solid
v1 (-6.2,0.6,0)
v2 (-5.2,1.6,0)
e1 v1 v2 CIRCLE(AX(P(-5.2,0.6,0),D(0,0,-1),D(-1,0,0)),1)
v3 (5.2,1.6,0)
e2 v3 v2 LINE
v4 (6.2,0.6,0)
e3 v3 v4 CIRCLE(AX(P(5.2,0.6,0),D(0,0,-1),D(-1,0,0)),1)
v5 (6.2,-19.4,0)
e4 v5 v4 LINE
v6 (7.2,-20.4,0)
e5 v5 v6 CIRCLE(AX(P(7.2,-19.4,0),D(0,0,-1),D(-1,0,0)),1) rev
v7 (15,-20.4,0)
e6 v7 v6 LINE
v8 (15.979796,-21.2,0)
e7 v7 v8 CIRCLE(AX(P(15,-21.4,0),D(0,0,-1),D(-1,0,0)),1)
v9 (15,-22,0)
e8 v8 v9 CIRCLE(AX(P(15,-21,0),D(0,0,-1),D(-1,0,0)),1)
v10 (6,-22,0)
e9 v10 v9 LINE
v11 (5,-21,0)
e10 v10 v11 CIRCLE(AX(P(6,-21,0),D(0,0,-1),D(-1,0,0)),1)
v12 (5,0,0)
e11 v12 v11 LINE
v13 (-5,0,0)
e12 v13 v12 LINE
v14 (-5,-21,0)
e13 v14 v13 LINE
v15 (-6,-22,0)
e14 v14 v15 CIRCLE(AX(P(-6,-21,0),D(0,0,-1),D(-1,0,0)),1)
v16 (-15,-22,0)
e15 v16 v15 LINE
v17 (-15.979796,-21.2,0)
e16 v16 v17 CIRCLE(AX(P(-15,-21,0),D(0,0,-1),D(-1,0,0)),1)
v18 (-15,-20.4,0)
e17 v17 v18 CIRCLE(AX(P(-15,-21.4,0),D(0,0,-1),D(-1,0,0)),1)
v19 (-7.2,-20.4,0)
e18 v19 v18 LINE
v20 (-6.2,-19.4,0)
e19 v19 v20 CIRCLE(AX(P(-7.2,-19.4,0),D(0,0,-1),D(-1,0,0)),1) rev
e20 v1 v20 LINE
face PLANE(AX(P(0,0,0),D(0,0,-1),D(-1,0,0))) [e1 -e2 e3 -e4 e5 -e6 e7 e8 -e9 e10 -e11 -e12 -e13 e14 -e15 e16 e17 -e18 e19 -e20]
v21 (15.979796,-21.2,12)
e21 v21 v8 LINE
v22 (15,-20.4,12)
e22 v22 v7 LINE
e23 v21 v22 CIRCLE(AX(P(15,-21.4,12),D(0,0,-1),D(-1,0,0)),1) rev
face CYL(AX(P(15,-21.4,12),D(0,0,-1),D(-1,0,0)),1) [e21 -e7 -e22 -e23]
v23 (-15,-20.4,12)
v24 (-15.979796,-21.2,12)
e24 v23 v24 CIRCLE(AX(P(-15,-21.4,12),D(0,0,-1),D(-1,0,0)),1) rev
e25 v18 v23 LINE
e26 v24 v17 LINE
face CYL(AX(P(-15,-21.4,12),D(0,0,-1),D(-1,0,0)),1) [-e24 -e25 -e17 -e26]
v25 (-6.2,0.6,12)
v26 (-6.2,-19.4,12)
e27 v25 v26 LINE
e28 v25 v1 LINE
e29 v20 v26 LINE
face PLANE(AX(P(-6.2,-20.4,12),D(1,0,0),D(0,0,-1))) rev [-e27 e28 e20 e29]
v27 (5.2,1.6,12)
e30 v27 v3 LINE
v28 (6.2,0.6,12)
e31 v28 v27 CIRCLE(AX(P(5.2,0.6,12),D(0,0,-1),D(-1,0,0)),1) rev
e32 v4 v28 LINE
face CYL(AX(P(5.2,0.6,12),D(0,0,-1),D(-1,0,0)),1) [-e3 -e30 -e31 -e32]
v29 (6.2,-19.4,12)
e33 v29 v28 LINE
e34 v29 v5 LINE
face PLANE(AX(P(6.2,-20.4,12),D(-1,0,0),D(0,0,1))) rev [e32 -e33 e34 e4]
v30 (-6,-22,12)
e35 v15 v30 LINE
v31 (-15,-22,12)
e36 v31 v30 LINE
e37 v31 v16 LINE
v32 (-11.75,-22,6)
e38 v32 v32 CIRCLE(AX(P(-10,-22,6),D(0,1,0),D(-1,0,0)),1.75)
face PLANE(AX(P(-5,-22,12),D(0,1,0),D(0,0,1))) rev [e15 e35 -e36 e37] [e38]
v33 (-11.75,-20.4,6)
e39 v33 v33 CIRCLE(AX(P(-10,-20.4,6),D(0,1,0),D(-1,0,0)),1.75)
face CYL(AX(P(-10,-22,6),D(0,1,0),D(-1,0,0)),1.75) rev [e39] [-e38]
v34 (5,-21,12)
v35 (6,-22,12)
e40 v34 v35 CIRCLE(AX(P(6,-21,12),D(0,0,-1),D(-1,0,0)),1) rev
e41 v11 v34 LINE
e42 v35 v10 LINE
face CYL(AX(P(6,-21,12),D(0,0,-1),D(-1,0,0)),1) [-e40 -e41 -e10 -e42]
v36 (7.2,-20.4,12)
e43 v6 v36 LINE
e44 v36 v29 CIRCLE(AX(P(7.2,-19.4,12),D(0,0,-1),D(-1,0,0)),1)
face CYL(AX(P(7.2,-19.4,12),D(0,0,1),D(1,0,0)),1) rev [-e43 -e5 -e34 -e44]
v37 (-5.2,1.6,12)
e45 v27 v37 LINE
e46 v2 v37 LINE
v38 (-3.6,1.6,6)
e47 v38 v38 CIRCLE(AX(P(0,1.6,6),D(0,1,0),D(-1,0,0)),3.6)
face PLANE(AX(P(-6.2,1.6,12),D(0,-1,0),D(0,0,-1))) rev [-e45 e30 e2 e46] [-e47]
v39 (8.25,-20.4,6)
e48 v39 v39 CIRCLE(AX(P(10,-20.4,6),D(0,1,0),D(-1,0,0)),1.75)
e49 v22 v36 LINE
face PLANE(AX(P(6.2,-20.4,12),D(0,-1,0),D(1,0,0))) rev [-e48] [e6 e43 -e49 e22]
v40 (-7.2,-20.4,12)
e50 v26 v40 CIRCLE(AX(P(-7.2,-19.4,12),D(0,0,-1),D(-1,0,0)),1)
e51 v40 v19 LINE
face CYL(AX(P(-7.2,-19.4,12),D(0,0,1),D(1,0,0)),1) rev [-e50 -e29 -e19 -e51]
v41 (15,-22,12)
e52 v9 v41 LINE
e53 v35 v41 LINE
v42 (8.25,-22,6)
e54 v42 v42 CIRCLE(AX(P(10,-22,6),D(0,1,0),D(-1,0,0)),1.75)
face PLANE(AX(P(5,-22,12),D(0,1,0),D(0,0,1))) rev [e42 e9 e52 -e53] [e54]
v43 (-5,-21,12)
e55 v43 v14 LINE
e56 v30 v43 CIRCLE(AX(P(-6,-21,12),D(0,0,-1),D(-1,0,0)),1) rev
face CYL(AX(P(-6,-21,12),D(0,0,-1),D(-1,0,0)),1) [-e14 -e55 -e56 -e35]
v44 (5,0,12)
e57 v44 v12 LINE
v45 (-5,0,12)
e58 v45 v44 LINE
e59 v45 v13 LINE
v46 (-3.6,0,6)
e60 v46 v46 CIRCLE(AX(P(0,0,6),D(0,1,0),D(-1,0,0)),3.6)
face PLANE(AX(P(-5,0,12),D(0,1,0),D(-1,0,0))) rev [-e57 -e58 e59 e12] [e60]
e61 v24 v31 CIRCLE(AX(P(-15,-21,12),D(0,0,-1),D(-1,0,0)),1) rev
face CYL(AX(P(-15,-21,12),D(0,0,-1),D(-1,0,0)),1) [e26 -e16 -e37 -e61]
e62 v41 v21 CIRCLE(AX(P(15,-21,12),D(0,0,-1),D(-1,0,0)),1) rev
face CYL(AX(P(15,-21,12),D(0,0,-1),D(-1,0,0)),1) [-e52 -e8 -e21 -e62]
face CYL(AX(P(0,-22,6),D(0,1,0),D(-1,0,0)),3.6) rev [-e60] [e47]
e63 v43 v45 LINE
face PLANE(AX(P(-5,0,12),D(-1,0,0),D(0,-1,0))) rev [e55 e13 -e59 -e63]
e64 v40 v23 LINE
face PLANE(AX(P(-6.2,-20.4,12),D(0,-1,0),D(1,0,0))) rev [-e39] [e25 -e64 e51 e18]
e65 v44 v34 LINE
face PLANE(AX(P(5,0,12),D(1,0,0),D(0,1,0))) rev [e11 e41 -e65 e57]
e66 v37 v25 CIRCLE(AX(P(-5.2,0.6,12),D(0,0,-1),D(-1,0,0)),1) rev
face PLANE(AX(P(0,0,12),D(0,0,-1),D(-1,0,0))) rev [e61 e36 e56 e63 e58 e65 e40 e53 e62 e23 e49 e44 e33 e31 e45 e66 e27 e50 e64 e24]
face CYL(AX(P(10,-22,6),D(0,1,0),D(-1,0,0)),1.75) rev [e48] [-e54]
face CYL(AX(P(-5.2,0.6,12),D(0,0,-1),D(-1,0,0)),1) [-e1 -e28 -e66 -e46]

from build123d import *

# Parameters (mm, degrees)
BOSS_EXTRUDE1_DEPTH = 12
SKETCH3_R           = 3.6
CUT_EXTRUDE1_DEPTH  = 31.934770082
SKETCH5_R           = 1.75
CUT_EXTRUDE2_DEPTH  = 30.732137495
FILLET1_R           = 1


with BuildPart() as part:
    # Sketch2 → Boss-Extrude1 (new body)
    with BuildSketch(Plane.XY):
        Polygon((-5, 0), (5, 0), (5, -22), (16, -22), (16, -20.4), (6.2, -20.4), (6.2, 1.6), (-6.2, 1.6), (-6.2, -20.4), (-16, -20.4), (-16, -22), (-5, -22), align=None)
    extrude(amount=BOSS_EXTRUDE1_DEPTH)

    # Sketch3 → Cut-Extrude1 (cut, through all)
    with BuildSketch(Plane(origin=(0, 1.6, 0), x_dir=(1, 0, 0), z_dir=(0, 1, 0))):
        with Locations(Location((0, -6, 0), (0, 0, 180))):
            Circle(SKETCH3_R)
    extrude(amount=-CUT_EXTRUDE1_DEPTH, mode=Mode.SUBTRACT)

    # Sketch5 → Cut-Extrude2 (cut, through all)
    with BuildSketch(Plane(origin=(0, -20.4, 0), x_dir=(1, 0, 0), z_dir=(0, 1, 0))):
        with Locations(Location((-10, -6, 0), (0, 0, 180))):
            Circle(SKETCH5_R)
        with Locations(Location((10, -6, 0), (0, 0, 180))):
            Circle(SKETCH5_R)
    extrude(amount=-CUT_EXTRUDE2_DEPTH, mode=Mode.SUBTRACT)

    # Fillet1
    # the kernel refuses this fillet: 1 mm, written as the material it adds along each edge
    with BuildSketch(Plane(origin=(-6.2, -20.4, 0), x_dir=(0, 1, 0), z_dir=(0, 0, 1)), Plane(origin=(6.2, -20.4, 0), x_dir=(1, 0, 0), z_dir=(0, 0, 1))) as fillet1_piece_1:
        with BuildLine():
            CenterArc((FILLET1_R, FILLET1_R), FILLET1_R, 180, 90)
            Line((0, FILLET1_R), (0, 0))
            Line((0, 0), (FILLET1_R, 0))
        make_face()
    extrude(amount=12)
    # the kernel refuses this fillet: 1 mm, written as the material it takes off along each edge
    with BuildSketch(Plane(origin=(16, -20.4, -2.5), x_dir=(0, -1, 0), z_dir=(0, 0, 1)), Plane(origin=(16, -22, -2.5), x_dir=(-1, 0, 0), z_dir=(0, 0, 1)), Plane(origin=(-16, -20.4, -2.5), x_dir=(1, 0, 0), z_dir=(0, 0, 1)), Plane(origin=(-6.2, 1.6, -2.5), x_dir=(1, 0, 0), z_dir=(0, 0, 1)), Plane(origin=(6.2, 1.6, -2.5), x_dir=(0, -1, 0), z_dir=(0, 0, 1)), Plane(origin=(5, -22, -2.5), x_dir=(0, 1, 0), z_dir=(0, 0, 1))) as fillet1_2_piece_1:
        with BuildLine():
            CenterArc((FILLET1_R, -FILLET1_R), FILLET1_R, 90, 90)
            Line((0, -FILLET1_R), (0, 0))
            Line((0, 0), (FILLET1_R, 0))
        make_face()
    extrude(amount=17, mode=Mode.SUBTRACT)
    with BuildSketch(Plane(origin=(-16, -22, -2.5), x_dir=(1, 0, 0), z_dir=(0, 0, 1)), Plane(origin=(-5, -22, -2.5), x_dir=(0, 1, 0), z_dir=(0, 0, 1))) as fillet1_2_piece_2:
        with BuildLine():
            CenterArc((FILLET1_R, FILLET1_R), FILLET1_R, 180, 90)
            Line((0, FILLET1_R), (0, 0))
            Line((0, 0), (FILLET1_R, 0))
        make_face()
    extrude(amount=17, mode=Mode.SUBTRACT)


solid = part.part
